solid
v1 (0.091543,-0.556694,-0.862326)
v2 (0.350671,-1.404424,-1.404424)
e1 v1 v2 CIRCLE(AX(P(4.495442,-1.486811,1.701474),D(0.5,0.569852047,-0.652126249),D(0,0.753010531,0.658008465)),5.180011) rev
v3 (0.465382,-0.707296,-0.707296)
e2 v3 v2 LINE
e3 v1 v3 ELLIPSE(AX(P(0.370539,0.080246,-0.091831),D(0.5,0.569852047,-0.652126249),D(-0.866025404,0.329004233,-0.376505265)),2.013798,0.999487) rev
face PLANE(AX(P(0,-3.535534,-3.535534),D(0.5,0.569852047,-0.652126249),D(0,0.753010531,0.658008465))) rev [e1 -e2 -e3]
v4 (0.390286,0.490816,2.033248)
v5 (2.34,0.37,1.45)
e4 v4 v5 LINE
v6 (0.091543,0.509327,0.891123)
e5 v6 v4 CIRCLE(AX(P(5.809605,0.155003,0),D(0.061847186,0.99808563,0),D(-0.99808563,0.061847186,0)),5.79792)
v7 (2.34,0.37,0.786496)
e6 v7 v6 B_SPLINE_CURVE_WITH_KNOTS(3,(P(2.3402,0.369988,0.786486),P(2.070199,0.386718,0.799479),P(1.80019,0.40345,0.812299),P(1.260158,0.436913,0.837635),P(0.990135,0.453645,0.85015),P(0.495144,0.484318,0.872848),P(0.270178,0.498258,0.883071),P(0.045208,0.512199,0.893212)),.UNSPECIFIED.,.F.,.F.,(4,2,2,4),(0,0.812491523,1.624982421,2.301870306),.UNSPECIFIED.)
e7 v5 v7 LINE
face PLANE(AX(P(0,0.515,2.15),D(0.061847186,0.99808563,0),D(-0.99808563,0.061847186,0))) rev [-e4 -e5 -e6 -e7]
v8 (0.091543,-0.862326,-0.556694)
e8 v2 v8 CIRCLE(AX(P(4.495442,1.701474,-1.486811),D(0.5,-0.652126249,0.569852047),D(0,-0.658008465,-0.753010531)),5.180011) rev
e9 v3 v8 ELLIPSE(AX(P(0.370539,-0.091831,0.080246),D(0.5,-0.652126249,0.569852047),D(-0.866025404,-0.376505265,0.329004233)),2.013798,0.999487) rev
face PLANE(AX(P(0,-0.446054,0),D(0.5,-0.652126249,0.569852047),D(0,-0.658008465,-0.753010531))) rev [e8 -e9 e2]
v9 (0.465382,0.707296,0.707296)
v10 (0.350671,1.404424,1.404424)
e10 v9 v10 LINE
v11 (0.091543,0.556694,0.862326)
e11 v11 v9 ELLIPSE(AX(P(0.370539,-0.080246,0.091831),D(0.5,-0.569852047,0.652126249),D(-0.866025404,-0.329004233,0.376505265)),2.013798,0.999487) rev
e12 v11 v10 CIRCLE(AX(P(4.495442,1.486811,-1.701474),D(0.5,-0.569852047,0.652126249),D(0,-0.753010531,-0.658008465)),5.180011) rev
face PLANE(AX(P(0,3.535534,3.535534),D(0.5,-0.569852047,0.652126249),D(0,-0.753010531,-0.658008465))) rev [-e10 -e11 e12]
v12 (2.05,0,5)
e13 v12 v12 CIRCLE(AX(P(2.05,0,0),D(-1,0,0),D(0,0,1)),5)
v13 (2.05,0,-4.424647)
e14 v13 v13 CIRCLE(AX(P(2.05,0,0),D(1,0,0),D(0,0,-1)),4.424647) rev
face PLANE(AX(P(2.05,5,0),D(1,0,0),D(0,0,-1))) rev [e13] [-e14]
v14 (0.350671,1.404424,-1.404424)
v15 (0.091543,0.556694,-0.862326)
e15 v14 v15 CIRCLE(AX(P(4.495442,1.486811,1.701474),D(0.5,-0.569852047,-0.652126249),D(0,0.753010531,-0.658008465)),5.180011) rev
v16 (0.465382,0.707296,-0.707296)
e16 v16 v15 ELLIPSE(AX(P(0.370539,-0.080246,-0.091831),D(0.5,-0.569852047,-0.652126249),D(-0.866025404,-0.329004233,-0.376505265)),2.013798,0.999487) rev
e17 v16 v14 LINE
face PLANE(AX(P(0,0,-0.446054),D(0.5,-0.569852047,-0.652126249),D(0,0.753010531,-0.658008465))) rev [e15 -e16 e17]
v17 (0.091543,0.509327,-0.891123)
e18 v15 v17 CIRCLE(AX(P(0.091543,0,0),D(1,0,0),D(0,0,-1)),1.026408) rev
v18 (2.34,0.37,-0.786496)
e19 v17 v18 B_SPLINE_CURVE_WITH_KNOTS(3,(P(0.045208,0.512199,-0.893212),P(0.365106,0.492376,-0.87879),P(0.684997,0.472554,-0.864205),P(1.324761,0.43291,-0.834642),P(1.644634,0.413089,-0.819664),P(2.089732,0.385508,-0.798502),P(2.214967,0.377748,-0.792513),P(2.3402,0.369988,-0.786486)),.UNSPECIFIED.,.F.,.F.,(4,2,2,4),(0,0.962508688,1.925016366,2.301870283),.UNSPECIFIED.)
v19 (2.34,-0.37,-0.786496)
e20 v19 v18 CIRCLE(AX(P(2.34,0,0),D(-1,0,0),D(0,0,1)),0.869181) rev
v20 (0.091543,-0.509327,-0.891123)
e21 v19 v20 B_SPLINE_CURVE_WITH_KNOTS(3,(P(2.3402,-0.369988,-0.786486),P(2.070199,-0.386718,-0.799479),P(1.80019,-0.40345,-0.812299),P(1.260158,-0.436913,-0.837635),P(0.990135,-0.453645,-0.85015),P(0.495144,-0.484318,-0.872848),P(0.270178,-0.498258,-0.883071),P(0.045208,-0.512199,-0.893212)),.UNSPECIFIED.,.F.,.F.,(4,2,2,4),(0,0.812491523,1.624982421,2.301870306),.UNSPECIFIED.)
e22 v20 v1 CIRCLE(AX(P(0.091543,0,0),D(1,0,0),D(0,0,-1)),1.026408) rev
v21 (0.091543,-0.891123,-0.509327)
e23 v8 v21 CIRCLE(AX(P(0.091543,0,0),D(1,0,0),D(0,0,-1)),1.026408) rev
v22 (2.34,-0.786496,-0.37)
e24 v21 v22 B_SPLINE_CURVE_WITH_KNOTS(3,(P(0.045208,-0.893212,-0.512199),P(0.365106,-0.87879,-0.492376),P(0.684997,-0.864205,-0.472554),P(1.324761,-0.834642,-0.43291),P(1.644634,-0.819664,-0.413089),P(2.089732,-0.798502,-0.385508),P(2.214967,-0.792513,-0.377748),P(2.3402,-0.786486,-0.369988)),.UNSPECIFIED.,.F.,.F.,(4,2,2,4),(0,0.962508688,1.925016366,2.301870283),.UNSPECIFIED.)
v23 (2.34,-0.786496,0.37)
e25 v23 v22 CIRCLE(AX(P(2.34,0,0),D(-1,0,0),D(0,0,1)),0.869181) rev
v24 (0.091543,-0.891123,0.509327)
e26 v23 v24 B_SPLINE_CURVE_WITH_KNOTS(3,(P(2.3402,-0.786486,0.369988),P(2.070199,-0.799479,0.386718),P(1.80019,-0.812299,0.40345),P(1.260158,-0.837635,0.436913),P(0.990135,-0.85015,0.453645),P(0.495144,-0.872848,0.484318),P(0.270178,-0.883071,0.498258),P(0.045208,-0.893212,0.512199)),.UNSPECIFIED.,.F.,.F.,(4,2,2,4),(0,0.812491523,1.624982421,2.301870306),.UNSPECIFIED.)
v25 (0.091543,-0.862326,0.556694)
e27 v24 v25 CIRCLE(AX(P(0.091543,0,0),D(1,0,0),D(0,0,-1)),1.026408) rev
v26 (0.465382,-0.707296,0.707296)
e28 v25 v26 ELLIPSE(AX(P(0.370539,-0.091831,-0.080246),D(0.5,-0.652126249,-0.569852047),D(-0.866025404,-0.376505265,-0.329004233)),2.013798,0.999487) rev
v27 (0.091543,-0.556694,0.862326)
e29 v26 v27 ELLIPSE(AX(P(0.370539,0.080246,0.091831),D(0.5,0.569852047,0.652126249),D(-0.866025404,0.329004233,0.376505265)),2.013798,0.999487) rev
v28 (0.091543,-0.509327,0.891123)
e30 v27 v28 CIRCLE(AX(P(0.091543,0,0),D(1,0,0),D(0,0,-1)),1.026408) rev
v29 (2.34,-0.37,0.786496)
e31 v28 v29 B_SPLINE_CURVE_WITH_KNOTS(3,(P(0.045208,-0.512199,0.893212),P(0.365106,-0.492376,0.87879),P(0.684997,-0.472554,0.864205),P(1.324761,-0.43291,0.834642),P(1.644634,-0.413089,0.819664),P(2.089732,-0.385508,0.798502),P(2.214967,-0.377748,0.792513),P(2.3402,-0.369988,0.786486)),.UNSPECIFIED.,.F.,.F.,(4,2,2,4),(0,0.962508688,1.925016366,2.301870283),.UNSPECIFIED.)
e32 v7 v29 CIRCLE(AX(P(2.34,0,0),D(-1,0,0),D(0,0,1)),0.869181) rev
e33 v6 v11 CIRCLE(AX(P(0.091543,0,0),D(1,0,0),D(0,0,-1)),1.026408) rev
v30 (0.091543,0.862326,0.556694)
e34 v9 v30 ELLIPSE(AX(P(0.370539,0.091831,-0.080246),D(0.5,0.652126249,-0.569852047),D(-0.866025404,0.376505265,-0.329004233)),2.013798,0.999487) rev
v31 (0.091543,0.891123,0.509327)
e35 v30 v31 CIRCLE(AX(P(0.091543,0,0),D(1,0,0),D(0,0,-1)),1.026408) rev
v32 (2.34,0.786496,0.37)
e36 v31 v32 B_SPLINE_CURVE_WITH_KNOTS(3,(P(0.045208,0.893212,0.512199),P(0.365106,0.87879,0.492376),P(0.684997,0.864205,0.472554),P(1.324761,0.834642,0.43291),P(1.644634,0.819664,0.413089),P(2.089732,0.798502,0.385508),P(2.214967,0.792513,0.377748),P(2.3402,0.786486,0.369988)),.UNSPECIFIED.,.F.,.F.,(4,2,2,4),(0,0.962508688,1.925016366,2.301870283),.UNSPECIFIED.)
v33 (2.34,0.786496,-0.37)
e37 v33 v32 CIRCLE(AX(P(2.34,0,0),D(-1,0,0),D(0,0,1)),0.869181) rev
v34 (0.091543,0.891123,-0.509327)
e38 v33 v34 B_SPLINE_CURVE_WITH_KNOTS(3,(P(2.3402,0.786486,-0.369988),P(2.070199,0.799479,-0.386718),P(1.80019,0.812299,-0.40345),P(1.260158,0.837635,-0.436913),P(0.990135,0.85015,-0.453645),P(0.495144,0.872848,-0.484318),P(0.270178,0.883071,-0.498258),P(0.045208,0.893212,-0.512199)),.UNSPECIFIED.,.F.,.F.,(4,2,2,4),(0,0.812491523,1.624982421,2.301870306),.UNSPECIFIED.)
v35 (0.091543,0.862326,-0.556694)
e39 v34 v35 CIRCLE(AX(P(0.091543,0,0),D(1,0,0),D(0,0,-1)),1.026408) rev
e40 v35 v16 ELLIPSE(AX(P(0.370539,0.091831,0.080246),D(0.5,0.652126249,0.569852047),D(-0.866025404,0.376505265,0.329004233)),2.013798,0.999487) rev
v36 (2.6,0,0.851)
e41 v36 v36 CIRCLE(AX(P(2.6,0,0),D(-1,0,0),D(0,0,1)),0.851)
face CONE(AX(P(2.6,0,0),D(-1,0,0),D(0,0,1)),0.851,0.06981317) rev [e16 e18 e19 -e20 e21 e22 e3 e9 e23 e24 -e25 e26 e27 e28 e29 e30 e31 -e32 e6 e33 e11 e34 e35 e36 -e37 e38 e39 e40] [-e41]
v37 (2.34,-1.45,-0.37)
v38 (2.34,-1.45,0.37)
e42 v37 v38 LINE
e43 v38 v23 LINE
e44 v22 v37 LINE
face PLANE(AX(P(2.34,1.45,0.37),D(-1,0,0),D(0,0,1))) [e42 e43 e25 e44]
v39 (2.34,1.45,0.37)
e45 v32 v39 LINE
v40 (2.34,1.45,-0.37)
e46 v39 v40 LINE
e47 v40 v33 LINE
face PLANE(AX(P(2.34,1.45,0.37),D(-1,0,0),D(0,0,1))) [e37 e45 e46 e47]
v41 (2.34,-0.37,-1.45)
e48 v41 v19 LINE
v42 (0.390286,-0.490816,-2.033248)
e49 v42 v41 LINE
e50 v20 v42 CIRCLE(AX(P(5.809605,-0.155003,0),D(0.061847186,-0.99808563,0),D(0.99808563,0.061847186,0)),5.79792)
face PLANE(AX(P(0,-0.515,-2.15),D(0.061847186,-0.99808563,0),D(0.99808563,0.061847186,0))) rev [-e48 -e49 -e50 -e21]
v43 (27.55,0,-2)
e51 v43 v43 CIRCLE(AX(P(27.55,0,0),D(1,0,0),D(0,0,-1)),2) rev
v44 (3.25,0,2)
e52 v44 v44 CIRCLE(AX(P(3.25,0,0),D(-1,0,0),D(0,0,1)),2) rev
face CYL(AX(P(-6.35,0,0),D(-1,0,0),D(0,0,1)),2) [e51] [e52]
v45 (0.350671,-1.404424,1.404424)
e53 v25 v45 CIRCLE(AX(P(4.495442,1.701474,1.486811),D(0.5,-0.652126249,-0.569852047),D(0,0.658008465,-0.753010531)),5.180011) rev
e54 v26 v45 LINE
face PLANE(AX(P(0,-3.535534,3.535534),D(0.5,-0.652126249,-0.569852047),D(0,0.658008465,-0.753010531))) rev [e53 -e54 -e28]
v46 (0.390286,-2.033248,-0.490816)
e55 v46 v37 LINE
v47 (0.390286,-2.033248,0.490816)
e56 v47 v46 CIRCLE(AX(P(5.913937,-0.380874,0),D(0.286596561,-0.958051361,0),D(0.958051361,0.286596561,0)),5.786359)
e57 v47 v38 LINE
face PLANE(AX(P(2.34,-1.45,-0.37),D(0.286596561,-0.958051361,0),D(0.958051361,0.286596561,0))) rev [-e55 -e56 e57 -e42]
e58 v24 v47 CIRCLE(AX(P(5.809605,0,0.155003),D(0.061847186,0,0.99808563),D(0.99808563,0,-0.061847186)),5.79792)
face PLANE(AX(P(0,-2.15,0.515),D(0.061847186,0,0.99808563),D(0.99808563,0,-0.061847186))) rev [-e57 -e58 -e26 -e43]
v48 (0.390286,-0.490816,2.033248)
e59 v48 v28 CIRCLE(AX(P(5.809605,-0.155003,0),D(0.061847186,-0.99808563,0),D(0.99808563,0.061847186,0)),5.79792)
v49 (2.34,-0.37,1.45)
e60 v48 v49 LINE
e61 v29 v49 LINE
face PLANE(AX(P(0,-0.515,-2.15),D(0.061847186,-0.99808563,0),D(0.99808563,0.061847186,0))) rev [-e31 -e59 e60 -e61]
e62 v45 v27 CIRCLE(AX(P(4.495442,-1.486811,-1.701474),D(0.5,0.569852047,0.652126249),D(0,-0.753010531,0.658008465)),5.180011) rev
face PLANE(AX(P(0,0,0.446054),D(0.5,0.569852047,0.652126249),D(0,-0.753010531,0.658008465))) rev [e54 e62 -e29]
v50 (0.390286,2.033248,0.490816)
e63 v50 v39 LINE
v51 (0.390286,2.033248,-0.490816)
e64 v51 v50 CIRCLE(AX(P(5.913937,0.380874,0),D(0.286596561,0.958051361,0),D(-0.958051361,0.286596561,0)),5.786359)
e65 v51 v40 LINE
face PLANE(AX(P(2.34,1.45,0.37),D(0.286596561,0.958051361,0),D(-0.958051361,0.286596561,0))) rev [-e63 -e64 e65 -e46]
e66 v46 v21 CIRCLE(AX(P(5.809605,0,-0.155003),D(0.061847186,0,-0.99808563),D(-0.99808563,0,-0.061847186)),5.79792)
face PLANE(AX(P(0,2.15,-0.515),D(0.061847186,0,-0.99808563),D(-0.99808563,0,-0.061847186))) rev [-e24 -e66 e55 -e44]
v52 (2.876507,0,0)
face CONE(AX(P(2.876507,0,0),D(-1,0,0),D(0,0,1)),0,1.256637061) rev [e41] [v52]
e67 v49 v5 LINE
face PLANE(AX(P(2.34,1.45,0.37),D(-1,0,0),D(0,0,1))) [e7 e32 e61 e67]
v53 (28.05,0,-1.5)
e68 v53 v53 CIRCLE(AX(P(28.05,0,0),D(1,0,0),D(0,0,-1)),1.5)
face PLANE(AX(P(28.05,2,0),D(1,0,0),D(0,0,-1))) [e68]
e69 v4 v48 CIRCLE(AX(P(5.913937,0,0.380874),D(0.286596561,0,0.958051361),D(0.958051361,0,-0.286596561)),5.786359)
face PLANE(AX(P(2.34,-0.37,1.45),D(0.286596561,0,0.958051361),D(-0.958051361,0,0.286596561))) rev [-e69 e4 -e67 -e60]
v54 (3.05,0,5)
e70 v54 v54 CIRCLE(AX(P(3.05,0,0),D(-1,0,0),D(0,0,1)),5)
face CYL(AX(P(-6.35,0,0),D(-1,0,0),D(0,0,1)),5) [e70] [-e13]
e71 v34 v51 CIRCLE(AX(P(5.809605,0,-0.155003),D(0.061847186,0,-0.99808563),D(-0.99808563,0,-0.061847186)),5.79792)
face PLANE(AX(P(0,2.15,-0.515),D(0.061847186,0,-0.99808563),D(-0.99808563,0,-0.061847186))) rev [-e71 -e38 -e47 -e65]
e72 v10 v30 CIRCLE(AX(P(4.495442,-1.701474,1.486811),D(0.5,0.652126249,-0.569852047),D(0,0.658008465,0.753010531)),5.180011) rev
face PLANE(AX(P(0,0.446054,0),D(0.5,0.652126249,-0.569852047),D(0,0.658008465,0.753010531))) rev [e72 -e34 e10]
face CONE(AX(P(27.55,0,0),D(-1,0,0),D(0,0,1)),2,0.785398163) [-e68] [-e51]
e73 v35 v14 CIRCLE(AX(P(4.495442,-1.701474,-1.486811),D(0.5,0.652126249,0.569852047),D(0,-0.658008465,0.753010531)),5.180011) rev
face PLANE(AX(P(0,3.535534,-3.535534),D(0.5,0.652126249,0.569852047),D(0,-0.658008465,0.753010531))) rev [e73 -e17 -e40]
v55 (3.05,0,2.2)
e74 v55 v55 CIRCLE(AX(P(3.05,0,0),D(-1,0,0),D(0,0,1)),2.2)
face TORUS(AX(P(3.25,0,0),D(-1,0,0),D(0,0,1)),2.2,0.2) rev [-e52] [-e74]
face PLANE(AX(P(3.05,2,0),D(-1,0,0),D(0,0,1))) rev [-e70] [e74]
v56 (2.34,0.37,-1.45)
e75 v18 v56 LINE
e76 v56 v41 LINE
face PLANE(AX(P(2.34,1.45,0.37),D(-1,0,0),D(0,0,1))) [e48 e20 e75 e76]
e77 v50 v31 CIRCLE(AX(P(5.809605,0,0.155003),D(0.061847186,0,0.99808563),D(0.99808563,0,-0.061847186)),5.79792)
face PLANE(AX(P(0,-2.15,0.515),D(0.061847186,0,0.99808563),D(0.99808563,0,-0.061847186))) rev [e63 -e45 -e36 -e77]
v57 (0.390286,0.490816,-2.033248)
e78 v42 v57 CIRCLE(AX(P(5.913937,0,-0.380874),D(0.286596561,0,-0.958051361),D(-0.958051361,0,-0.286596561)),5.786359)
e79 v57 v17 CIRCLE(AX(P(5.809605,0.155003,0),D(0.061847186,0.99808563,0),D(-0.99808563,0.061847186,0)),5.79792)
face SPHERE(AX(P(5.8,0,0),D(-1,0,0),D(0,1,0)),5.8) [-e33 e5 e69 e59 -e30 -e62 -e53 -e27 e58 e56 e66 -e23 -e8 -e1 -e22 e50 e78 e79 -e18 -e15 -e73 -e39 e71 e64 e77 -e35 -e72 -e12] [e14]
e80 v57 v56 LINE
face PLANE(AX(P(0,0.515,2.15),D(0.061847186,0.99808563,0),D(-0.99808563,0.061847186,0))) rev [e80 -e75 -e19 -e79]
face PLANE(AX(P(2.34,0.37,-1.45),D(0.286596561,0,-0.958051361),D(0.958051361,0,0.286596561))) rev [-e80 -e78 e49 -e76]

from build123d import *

# Parameters (mm, degrees)
FILLET1_R             = 0.2
RECPAT_COUNT          = 2
RECPAT_ANGLE          = 90
CHAMFER_1_SIZE        = 0.5
CUT_EXTRUDE_START     = -1.932317225
CUT_EXTRUDE_1_DEPTH   = 0.992538955
CUT_EXTRUDE_1_2_DEPTH = 0.992538955
CUT_EXTRUDE_1_3_DEPTH = 0.992538955
CUT_EXTRUDE_1_4_DEPTH = 0.992538955


# Read off the part's stored shape, not the designer's step: Вытянуть1
with BuildPart() as part:
    # BodySke → Base-Revolve (revolve)
    with BuildSketch(Plane.XY, mode=Mode.PRIVATE) as base_revolve_sk:
        Polygon((3.05, 2), (3.05, 5), (2.05, 5), (2.05, 0), (28.05, 0), (28.05, 2), align=None)
    revolve(base_revolve_sk.sketch.rotate(Axis((-6.35, 0, 0), (1, 0, 0)), 90), axis=Axis((-6.35, 0, 0), (1, 0, 0)))

    # Fillet1
    fillet1_edges = [part.edges().sort_by_distance(p)[0] for p in [
        (3.05, 0, -2),
    ]]
    fillet(fillet1_edges, radius=FILLET1_R)

    # PanSke → Pan (revolve)
    with BuildSketch(Plane.XY):
        with BuildLine():
            Line((2.05, 4.424646879), (2.05, 0))
            Line((2.05, 0), (0, 0))
            ThreePointArc((0, 0), (0.537396082, 2.438237068), (2.05, 4.424646879))
        make_face()
    revolve(axis=Axis((0, 0, 0), (1, 0, 0)))

    # Sketch3 → Recess section 0
    with BuildSketch(Plane(origin=(0, 0, 0), x_dir=(0, 0, -1), z_dir=(1, 0, 0))):
        with BuildLine():
            Line((-0.515, 2.15), (0.515, 2.15))
            Line((0.515, 2.15), (0.515, -2.15))
            Line((0.515, -2.15), (-0.515, -2.15))
            Line((-0.515, -2.15), (-0.515, 2.15))
        make_face()
    # Sketch4 → Recess section 1
    with BuildSketch(Plane(origin=(2.34, 0, 0), x_dir=(0, 0, -1), z_dir=(1, 0, 0))):
        with BuildLine():
            Line((-0.37, 1.45), (0.37, 1.45))
            Line((0.37, 1.45), (0.37, -1.45))
            Line((0.37, -1.45), (-0.37, -1.45))
            Line((-0.37, -1.45), (-0.37, 1.45))
        make_face()
    recess = loft(mode=Mode.SUBTRACT)

    # RecPat: Recess ×2 about axis
    recpat_axis = Axis((0, 0, 0), (1, 0, 0))
    for i in range(1, RECPAT_COUNT):
        add(recess.rotate(recpat_axis, i * RECPAT_ANGLE / (RECPAT_COUNT - 1)), mode=Mode.SUBTRACT)

    # RecCorSke → RecessCore (revolve, cut)
    with BuildSketch(Plane.XY, mode=Mode.PRIVATE) as recesscore_sk:
        Polygon((0, 0), (0, 1.032809711), (2.6, 0.851), (2.876506661, 0), align=None)
    revolve(recesscore_sk.sketch.rotate(Axis((-3.175, 0, 0), (1, 0, 0)), 90), axis=Axis((-3.175, 0, 0), (1, 0, 0)), mode=Mode.SUBTRACT)

    # Фаска1
    chamfer_1_edges = [part.edges().sort_by_distance(p)[0] for p in [
        (28.05, 0, -2),
    ]]
    chamfer(chamfer_1_edges, length=CHAMFER_1_SIZE)

    # Вытянуть1 outline → Вытянуть1 (cut)
    with BuildSketch(Plane(origin=(0, 0, 0), x_dir=(0.9932989193126689, -0.08172287590474318, -0.08172287590474292), z_dir=(0.11557359946062105, 0.7023684015912586, 0.7023684015912564)).offset(CUT_EXTRUDE_START)):
        Polygon((-1, -0.919204654), (0.206895578, -0.216114133), (0.577867997, 0), (0.206895578, 0.216114133), (-1, 0.919204654), align=None)
    extrude(amount=CUT_EXTRUDE_1_DEPTH, mode=Mode.SUBTRACT)

    # Cut-Extrude 1 2 outline → Cut-Extrude 1 2 (cut)
    with BuildSketch(Plane(origin=(0, 0, 0), x_dir=(0.9932989193126689, -0.08172287590474318, 0.08172287590474292), z_dir=(0.11557359946062105, 0.7023684015912586, -0.7023684015912564)).offset(CUT_EXTRUDE_START)):
        Polygon((0.206895578, -0.216114133), (0.577867997, 0), (0.206895578, 0.216114133), (-1, 0.919204654), (-1, -0.919204654), align=None)
    extrude(amount=CUT_EXTRUDE_1_2_DEPTH, mode=Mode.SUBTRACT)

    # Cut-Extrude 1 3 outline → Cut-Extrude 1 3 (cut)
    with BuildSketch(Plane(origin=(0, 0, 0), x_dir=(0.9932989193126689, 0.08172287590474318, 0.08172287590474292), z_dir=(0.11557359946062105, -0.7023684015912586, -0.7023684015912564)).offset(CUT_EXTRUDE_START)):
        Polygon((0.206895578, -0.216114133), (0.577867997, 0), (0.206895578, 0.216114133), (-1, 0.919204654), (-1, -0.919204654), align=None)
    extrude(amount=CUT_EXTRUDE_1_3_DEPTH, mode=Mode.SUBTRACT)

    # Cut-Extrude 1 4 outline → Cut-Extrude 1 4 (cut)
    with BuildSketch(Plane(origin=(0, 0, 0), x_dir=(0.9932989193126689, 0.08172287590474318, -0.08172287590474292), z_dir=(0.11557359946062105, -0.7023684015912586, 0.7023684015912564)).offset(CUT_EXTRUDE_START)):
        Polygon((-1, -0.919204654), (0.206895578, -0.216114133), (0.577867997, 0), (0.206895578, 0.216114133), (-1, 0.919204654), align=None)
    extrude(amount=CUT_EXTRUDE_1_4_DEPTH, mode=Mode.SUBTRACT)


solid = part.part
